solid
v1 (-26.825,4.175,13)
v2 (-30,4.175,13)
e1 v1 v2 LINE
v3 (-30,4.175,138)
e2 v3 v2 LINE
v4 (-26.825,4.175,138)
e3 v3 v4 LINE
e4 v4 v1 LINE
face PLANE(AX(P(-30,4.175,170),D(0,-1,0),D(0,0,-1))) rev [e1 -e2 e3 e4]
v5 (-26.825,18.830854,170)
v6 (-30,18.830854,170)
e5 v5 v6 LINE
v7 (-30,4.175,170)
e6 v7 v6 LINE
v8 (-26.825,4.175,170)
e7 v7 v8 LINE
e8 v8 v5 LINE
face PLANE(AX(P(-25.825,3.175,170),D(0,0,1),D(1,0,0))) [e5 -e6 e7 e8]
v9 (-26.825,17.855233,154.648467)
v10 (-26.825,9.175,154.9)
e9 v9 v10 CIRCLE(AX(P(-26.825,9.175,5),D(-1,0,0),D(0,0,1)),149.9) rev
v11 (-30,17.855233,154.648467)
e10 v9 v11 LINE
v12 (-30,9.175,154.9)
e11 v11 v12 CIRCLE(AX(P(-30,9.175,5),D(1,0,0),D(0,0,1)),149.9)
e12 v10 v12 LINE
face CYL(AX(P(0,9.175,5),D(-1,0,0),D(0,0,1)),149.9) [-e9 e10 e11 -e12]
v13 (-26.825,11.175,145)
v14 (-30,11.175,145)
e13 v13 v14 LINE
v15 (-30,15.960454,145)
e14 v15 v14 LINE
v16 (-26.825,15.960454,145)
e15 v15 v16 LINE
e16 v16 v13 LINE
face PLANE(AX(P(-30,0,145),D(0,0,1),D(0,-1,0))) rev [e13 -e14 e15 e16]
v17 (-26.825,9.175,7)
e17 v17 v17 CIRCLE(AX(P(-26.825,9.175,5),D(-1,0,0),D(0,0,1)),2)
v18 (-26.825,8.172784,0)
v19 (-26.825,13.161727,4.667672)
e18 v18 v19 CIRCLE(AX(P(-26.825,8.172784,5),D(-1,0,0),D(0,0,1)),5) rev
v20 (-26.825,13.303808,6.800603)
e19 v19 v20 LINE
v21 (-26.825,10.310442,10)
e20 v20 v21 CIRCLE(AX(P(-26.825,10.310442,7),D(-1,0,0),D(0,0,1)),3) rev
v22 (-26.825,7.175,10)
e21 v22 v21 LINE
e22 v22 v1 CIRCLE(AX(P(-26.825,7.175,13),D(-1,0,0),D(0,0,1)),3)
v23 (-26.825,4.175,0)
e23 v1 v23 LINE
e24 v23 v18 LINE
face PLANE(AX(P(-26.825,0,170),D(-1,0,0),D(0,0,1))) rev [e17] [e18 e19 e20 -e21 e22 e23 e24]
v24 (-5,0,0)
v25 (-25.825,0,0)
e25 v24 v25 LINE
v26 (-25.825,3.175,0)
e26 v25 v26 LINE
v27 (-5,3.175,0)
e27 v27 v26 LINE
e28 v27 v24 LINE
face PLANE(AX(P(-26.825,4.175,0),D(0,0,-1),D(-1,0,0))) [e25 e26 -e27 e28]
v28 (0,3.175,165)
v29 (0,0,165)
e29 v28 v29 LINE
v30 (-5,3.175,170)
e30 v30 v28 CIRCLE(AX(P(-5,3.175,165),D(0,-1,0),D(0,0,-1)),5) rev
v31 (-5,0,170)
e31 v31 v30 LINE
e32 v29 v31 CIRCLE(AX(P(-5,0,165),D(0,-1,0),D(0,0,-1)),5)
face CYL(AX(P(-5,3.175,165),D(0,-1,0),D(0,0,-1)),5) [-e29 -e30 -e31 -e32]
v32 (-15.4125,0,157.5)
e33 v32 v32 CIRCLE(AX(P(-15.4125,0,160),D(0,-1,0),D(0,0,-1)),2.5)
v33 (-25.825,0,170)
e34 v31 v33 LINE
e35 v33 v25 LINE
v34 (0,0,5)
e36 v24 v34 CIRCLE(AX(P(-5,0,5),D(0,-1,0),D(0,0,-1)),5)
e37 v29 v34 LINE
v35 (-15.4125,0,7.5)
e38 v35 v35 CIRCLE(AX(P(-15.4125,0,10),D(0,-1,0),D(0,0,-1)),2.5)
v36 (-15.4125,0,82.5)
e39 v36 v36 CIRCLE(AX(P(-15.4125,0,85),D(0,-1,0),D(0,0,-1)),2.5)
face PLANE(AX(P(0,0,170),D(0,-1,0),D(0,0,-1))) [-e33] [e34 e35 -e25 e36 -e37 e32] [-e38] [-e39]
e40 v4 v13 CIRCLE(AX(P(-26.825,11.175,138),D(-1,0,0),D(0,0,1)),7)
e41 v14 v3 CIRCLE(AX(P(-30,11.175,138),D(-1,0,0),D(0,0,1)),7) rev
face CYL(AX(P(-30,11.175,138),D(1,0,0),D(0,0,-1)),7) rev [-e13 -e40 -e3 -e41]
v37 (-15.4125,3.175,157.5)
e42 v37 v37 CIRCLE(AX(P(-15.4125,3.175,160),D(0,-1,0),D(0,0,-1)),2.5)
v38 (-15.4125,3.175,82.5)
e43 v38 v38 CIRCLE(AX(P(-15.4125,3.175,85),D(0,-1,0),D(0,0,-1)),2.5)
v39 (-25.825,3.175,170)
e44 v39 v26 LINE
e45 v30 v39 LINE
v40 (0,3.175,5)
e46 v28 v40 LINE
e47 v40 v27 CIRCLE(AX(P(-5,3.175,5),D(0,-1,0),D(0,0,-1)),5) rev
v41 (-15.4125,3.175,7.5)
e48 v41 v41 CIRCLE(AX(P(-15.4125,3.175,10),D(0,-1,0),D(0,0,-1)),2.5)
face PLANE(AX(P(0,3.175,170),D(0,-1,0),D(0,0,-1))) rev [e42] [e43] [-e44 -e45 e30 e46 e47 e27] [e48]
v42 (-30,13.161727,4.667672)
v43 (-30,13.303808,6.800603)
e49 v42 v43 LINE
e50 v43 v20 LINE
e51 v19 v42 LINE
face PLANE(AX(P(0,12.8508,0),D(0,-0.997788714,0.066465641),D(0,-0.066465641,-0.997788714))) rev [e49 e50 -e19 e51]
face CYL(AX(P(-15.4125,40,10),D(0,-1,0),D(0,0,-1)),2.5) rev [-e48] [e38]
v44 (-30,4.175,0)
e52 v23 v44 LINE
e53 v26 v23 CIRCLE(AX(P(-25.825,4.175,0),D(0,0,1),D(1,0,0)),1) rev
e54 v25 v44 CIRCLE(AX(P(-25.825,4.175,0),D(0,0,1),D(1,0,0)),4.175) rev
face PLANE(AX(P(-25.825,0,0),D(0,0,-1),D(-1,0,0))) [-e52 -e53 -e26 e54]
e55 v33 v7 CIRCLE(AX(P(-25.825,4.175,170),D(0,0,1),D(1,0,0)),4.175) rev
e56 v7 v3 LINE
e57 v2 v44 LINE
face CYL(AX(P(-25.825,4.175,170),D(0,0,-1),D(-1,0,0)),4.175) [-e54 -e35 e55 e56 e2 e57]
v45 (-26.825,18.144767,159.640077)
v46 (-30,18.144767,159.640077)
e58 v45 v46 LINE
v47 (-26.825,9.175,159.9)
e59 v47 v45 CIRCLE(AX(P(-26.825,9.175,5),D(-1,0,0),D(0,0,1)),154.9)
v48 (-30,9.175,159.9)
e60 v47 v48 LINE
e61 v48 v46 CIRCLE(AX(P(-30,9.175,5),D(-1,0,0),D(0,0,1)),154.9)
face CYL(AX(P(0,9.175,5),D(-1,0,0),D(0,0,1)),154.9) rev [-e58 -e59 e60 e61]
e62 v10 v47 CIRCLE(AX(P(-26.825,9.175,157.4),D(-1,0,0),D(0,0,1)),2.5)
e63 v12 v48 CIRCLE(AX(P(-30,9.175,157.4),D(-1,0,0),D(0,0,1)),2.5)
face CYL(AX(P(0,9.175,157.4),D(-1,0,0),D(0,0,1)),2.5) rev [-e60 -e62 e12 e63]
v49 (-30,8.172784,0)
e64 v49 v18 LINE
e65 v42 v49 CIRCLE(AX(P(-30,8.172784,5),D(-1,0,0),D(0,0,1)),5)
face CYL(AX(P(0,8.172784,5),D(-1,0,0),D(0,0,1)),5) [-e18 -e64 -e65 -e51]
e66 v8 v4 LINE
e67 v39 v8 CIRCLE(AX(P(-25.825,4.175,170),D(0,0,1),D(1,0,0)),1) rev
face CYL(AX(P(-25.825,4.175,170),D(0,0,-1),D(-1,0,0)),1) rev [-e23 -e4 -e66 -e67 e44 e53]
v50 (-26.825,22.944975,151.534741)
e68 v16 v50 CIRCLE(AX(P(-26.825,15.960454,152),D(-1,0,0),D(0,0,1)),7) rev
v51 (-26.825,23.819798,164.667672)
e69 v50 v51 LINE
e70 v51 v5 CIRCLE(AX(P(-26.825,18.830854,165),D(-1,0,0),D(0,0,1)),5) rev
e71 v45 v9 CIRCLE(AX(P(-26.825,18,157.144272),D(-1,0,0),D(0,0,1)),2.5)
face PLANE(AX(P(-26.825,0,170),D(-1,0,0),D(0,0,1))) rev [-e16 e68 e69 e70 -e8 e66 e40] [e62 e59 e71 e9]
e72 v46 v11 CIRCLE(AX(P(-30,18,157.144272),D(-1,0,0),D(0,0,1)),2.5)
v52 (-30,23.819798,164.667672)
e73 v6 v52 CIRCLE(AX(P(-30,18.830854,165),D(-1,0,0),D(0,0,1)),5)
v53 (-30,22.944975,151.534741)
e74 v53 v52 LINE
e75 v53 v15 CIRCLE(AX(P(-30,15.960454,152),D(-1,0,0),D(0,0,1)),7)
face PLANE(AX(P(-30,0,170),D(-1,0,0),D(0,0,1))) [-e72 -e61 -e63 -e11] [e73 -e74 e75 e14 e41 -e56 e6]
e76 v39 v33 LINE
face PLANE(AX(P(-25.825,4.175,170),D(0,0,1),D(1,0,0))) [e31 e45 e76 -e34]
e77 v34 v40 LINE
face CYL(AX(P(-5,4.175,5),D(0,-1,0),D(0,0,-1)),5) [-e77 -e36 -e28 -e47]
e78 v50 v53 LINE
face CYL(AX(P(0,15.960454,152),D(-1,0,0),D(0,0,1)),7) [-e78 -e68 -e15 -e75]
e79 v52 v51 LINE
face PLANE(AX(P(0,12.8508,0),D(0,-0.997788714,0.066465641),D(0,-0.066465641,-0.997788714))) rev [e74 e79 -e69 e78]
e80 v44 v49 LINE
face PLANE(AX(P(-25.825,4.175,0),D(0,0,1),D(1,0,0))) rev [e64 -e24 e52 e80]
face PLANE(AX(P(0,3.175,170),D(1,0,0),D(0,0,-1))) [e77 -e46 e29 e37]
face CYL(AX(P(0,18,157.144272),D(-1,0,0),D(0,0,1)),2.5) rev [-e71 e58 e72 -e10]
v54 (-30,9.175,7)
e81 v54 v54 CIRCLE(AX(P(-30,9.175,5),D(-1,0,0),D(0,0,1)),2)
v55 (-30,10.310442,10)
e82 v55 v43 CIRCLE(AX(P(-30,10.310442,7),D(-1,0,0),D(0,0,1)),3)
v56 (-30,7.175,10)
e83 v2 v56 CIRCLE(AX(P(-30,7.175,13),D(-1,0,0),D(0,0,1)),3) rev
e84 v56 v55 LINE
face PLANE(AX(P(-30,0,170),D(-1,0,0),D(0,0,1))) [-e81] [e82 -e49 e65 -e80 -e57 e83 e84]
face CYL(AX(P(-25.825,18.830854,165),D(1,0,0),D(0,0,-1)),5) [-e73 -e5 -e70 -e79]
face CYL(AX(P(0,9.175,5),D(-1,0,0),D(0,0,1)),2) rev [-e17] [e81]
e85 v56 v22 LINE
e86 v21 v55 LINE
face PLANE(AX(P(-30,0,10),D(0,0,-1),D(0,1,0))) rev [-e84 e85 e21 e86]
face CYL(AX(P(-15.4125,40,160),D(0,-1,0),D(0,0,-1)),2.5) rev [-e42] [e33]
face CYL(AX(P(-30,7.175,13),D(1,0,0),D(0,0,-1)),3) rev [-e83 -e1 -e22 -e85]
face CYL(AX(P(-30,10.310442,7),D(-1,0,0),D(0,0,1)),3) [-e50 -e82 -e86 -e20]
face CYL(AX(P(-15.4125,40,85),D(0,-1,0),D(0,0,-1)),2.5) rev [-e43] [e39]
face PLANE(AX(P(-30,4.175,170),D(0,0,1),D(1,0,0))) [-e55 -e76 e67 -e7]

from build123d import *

# Parameters (mm, degrees)
BASE_FLANGE1_DEPTH = 170
FILLET1_R          = 5
SKETCH6_R          = 2
CUT_EXTRUDE1_DEPTH = 178.200451467
SKETCH7_R          = 2.5
CUT_EXTRUDE2_DEPTH = 178.200451467
CUT_EXTRUDE3_DEPTH = 178.200451467
FILLET2_R          = 5
CUT_EXTRUDE4_DEPTH = 175.263907966
FILLET3_R          = 3
FILLET4_R          = 7


# Sheet-metal steps are written as plain solids
with BuildPart() as part:
    # Sketch1 → Base-Flange1 (new body)
    with BuildSketch(Plane.XY):
        with BuildLine():
            Line((0, 0), (-25.825, 0))
            ThreePointArc((-25.825, 0), (-28.777170811, 1.222829189), (-30, 4.175))
            Line((-30, 4.175), (-30, 40))
            Line((-30, 40), (-26.825, 40))
            Line((-26.825, 40), (-26.825, 4.175))
            ThreePointArc((-26.825, 4.175), (-26.532106781, 3.467893219), (-25.825, 3.175))
            Line((-25.825, 3.175), (0, 3.175))
            Line((0, 3.175), (0, 0))
        make_face()
    extrude(amount=BASE_FLANGE1_DEPTH)

    # Fillet1
    fillet1_edges = [part.edges().sort_by_distance(p)[0] for p in [
        (0, 1.5875, 170),
        (0, 1.5875, 0),
        (-28.4125, 40, 170),
        (-28.4125, 40, 0),
    ]]
    fillet(fillet1_edges, radius=FILLET1_R)

    # Sketch6 → Cut-Extrude1 (cut, through all)
    with BuildSketch(Plane.ZY.offset(30)):
        with Locations((5, 9.175)):
            Circle(SKETCH6_R)
        with BuildLine():
            ThreePointArc((159.9, 9.175), (159.835005505, 13.661766133), (159.640076561, 18.14476706))
            ThreePointArc((159.640076561, 18.14476706), (156.999504521, 20.49580498), (154.648466601, 17.85523294))
            ThreePointArc((154.648466601, 17.85523294), (154.837103455, 13.516938304), (154.9, 9.175))
            ThreePointArc((154.9, 9.175), (157.4, 6.675), (159.9, 9.175))
        make_face()
    extrude(amount=-CUT_EXTRUDE1_DEPTH, mode=Mode.SUBTRACT)

    # Sketch7 → Cut-Extrude2 (cut, through all)
    with BuildSketch(Plane.XZ):
        with Locations(Location((-15.4125, 160, 0), (0, 0, 270))):
            Circle(SKETCH7_R)
        with Locations(Location((-15.4125, 85, 0), (0, 0, 270))):
            Circle(SKETCH7_R)
        with Locations(Location((-15.4125, 10, 0), (0, 0, 270))):
            Circle(SKETCH7_R)
    extrude(amount=-CUT_EXTRUDE2_DEPTH, mode=Mode.SUBTRACT)

    # Sketch8 → Cut-Extrude3 (cut, through all)
    with BuildSketch(Plane.ZY.offset(30)):
        with BuildLine():
            Line((0, 12.85080004), (170, 24.175))
            Line((170, 24.175), (170, 35))
            ThreePointArc((170, 35), (168.535533906, 38.535533906), (165, 40))
            Line((165, 40), (5, 40))
            ThreePointArc((5, 40), (1.464466094, 38.535533906), (0, 35))
            Line((0, 35), (0, 12.85080004))
        make_face()
    extrude(amount=-CUT_EXTRUDE3_DEPTH, mode=Mode.SUBTRACT)

    # Fillet2
    fillet2_edges = [part.edges().sort_by_distance(p)[0] for p in [
        (-28.4125, 24.175, 170),
        (-28.4125, 12.85080004, 0),
    ]]
    fillet(fillet2_edges, radius=FILLET2_R)

    # Sketch9 → Cut-Extrude4 (cut, through all)
    with BuildSketch(Plane.ZY.offset(30)):
        Polygon((10, 13.51692945), (10, 4.175), (145, 4.175), (145, 22.509676476), align=None)
    extrude(amount=-CUT_EXTRUDE4_DEPTH, mode=Mode.SUBTRACT)

    # Fillet3
    fillet3_edges = [part.edges().sort_by_distance(p)[0] for p in [
        (-28.4125, 4.175, 10),
        (-28.4125, 13.51692945, 10),
    ]]
    fillet(fillet3_edges, radius=FILLET3_R)

    # Fillet4
    fillet4_edges = [part.edges().sort_by_distance(p)[0] for p in [
        (-28.4125, 22.509676476, 145),
        (-28.4125, 4.175, 145),
    ]]
    fillet(fillet4_edges, radius=FILLET4_R)


solid = part.part
